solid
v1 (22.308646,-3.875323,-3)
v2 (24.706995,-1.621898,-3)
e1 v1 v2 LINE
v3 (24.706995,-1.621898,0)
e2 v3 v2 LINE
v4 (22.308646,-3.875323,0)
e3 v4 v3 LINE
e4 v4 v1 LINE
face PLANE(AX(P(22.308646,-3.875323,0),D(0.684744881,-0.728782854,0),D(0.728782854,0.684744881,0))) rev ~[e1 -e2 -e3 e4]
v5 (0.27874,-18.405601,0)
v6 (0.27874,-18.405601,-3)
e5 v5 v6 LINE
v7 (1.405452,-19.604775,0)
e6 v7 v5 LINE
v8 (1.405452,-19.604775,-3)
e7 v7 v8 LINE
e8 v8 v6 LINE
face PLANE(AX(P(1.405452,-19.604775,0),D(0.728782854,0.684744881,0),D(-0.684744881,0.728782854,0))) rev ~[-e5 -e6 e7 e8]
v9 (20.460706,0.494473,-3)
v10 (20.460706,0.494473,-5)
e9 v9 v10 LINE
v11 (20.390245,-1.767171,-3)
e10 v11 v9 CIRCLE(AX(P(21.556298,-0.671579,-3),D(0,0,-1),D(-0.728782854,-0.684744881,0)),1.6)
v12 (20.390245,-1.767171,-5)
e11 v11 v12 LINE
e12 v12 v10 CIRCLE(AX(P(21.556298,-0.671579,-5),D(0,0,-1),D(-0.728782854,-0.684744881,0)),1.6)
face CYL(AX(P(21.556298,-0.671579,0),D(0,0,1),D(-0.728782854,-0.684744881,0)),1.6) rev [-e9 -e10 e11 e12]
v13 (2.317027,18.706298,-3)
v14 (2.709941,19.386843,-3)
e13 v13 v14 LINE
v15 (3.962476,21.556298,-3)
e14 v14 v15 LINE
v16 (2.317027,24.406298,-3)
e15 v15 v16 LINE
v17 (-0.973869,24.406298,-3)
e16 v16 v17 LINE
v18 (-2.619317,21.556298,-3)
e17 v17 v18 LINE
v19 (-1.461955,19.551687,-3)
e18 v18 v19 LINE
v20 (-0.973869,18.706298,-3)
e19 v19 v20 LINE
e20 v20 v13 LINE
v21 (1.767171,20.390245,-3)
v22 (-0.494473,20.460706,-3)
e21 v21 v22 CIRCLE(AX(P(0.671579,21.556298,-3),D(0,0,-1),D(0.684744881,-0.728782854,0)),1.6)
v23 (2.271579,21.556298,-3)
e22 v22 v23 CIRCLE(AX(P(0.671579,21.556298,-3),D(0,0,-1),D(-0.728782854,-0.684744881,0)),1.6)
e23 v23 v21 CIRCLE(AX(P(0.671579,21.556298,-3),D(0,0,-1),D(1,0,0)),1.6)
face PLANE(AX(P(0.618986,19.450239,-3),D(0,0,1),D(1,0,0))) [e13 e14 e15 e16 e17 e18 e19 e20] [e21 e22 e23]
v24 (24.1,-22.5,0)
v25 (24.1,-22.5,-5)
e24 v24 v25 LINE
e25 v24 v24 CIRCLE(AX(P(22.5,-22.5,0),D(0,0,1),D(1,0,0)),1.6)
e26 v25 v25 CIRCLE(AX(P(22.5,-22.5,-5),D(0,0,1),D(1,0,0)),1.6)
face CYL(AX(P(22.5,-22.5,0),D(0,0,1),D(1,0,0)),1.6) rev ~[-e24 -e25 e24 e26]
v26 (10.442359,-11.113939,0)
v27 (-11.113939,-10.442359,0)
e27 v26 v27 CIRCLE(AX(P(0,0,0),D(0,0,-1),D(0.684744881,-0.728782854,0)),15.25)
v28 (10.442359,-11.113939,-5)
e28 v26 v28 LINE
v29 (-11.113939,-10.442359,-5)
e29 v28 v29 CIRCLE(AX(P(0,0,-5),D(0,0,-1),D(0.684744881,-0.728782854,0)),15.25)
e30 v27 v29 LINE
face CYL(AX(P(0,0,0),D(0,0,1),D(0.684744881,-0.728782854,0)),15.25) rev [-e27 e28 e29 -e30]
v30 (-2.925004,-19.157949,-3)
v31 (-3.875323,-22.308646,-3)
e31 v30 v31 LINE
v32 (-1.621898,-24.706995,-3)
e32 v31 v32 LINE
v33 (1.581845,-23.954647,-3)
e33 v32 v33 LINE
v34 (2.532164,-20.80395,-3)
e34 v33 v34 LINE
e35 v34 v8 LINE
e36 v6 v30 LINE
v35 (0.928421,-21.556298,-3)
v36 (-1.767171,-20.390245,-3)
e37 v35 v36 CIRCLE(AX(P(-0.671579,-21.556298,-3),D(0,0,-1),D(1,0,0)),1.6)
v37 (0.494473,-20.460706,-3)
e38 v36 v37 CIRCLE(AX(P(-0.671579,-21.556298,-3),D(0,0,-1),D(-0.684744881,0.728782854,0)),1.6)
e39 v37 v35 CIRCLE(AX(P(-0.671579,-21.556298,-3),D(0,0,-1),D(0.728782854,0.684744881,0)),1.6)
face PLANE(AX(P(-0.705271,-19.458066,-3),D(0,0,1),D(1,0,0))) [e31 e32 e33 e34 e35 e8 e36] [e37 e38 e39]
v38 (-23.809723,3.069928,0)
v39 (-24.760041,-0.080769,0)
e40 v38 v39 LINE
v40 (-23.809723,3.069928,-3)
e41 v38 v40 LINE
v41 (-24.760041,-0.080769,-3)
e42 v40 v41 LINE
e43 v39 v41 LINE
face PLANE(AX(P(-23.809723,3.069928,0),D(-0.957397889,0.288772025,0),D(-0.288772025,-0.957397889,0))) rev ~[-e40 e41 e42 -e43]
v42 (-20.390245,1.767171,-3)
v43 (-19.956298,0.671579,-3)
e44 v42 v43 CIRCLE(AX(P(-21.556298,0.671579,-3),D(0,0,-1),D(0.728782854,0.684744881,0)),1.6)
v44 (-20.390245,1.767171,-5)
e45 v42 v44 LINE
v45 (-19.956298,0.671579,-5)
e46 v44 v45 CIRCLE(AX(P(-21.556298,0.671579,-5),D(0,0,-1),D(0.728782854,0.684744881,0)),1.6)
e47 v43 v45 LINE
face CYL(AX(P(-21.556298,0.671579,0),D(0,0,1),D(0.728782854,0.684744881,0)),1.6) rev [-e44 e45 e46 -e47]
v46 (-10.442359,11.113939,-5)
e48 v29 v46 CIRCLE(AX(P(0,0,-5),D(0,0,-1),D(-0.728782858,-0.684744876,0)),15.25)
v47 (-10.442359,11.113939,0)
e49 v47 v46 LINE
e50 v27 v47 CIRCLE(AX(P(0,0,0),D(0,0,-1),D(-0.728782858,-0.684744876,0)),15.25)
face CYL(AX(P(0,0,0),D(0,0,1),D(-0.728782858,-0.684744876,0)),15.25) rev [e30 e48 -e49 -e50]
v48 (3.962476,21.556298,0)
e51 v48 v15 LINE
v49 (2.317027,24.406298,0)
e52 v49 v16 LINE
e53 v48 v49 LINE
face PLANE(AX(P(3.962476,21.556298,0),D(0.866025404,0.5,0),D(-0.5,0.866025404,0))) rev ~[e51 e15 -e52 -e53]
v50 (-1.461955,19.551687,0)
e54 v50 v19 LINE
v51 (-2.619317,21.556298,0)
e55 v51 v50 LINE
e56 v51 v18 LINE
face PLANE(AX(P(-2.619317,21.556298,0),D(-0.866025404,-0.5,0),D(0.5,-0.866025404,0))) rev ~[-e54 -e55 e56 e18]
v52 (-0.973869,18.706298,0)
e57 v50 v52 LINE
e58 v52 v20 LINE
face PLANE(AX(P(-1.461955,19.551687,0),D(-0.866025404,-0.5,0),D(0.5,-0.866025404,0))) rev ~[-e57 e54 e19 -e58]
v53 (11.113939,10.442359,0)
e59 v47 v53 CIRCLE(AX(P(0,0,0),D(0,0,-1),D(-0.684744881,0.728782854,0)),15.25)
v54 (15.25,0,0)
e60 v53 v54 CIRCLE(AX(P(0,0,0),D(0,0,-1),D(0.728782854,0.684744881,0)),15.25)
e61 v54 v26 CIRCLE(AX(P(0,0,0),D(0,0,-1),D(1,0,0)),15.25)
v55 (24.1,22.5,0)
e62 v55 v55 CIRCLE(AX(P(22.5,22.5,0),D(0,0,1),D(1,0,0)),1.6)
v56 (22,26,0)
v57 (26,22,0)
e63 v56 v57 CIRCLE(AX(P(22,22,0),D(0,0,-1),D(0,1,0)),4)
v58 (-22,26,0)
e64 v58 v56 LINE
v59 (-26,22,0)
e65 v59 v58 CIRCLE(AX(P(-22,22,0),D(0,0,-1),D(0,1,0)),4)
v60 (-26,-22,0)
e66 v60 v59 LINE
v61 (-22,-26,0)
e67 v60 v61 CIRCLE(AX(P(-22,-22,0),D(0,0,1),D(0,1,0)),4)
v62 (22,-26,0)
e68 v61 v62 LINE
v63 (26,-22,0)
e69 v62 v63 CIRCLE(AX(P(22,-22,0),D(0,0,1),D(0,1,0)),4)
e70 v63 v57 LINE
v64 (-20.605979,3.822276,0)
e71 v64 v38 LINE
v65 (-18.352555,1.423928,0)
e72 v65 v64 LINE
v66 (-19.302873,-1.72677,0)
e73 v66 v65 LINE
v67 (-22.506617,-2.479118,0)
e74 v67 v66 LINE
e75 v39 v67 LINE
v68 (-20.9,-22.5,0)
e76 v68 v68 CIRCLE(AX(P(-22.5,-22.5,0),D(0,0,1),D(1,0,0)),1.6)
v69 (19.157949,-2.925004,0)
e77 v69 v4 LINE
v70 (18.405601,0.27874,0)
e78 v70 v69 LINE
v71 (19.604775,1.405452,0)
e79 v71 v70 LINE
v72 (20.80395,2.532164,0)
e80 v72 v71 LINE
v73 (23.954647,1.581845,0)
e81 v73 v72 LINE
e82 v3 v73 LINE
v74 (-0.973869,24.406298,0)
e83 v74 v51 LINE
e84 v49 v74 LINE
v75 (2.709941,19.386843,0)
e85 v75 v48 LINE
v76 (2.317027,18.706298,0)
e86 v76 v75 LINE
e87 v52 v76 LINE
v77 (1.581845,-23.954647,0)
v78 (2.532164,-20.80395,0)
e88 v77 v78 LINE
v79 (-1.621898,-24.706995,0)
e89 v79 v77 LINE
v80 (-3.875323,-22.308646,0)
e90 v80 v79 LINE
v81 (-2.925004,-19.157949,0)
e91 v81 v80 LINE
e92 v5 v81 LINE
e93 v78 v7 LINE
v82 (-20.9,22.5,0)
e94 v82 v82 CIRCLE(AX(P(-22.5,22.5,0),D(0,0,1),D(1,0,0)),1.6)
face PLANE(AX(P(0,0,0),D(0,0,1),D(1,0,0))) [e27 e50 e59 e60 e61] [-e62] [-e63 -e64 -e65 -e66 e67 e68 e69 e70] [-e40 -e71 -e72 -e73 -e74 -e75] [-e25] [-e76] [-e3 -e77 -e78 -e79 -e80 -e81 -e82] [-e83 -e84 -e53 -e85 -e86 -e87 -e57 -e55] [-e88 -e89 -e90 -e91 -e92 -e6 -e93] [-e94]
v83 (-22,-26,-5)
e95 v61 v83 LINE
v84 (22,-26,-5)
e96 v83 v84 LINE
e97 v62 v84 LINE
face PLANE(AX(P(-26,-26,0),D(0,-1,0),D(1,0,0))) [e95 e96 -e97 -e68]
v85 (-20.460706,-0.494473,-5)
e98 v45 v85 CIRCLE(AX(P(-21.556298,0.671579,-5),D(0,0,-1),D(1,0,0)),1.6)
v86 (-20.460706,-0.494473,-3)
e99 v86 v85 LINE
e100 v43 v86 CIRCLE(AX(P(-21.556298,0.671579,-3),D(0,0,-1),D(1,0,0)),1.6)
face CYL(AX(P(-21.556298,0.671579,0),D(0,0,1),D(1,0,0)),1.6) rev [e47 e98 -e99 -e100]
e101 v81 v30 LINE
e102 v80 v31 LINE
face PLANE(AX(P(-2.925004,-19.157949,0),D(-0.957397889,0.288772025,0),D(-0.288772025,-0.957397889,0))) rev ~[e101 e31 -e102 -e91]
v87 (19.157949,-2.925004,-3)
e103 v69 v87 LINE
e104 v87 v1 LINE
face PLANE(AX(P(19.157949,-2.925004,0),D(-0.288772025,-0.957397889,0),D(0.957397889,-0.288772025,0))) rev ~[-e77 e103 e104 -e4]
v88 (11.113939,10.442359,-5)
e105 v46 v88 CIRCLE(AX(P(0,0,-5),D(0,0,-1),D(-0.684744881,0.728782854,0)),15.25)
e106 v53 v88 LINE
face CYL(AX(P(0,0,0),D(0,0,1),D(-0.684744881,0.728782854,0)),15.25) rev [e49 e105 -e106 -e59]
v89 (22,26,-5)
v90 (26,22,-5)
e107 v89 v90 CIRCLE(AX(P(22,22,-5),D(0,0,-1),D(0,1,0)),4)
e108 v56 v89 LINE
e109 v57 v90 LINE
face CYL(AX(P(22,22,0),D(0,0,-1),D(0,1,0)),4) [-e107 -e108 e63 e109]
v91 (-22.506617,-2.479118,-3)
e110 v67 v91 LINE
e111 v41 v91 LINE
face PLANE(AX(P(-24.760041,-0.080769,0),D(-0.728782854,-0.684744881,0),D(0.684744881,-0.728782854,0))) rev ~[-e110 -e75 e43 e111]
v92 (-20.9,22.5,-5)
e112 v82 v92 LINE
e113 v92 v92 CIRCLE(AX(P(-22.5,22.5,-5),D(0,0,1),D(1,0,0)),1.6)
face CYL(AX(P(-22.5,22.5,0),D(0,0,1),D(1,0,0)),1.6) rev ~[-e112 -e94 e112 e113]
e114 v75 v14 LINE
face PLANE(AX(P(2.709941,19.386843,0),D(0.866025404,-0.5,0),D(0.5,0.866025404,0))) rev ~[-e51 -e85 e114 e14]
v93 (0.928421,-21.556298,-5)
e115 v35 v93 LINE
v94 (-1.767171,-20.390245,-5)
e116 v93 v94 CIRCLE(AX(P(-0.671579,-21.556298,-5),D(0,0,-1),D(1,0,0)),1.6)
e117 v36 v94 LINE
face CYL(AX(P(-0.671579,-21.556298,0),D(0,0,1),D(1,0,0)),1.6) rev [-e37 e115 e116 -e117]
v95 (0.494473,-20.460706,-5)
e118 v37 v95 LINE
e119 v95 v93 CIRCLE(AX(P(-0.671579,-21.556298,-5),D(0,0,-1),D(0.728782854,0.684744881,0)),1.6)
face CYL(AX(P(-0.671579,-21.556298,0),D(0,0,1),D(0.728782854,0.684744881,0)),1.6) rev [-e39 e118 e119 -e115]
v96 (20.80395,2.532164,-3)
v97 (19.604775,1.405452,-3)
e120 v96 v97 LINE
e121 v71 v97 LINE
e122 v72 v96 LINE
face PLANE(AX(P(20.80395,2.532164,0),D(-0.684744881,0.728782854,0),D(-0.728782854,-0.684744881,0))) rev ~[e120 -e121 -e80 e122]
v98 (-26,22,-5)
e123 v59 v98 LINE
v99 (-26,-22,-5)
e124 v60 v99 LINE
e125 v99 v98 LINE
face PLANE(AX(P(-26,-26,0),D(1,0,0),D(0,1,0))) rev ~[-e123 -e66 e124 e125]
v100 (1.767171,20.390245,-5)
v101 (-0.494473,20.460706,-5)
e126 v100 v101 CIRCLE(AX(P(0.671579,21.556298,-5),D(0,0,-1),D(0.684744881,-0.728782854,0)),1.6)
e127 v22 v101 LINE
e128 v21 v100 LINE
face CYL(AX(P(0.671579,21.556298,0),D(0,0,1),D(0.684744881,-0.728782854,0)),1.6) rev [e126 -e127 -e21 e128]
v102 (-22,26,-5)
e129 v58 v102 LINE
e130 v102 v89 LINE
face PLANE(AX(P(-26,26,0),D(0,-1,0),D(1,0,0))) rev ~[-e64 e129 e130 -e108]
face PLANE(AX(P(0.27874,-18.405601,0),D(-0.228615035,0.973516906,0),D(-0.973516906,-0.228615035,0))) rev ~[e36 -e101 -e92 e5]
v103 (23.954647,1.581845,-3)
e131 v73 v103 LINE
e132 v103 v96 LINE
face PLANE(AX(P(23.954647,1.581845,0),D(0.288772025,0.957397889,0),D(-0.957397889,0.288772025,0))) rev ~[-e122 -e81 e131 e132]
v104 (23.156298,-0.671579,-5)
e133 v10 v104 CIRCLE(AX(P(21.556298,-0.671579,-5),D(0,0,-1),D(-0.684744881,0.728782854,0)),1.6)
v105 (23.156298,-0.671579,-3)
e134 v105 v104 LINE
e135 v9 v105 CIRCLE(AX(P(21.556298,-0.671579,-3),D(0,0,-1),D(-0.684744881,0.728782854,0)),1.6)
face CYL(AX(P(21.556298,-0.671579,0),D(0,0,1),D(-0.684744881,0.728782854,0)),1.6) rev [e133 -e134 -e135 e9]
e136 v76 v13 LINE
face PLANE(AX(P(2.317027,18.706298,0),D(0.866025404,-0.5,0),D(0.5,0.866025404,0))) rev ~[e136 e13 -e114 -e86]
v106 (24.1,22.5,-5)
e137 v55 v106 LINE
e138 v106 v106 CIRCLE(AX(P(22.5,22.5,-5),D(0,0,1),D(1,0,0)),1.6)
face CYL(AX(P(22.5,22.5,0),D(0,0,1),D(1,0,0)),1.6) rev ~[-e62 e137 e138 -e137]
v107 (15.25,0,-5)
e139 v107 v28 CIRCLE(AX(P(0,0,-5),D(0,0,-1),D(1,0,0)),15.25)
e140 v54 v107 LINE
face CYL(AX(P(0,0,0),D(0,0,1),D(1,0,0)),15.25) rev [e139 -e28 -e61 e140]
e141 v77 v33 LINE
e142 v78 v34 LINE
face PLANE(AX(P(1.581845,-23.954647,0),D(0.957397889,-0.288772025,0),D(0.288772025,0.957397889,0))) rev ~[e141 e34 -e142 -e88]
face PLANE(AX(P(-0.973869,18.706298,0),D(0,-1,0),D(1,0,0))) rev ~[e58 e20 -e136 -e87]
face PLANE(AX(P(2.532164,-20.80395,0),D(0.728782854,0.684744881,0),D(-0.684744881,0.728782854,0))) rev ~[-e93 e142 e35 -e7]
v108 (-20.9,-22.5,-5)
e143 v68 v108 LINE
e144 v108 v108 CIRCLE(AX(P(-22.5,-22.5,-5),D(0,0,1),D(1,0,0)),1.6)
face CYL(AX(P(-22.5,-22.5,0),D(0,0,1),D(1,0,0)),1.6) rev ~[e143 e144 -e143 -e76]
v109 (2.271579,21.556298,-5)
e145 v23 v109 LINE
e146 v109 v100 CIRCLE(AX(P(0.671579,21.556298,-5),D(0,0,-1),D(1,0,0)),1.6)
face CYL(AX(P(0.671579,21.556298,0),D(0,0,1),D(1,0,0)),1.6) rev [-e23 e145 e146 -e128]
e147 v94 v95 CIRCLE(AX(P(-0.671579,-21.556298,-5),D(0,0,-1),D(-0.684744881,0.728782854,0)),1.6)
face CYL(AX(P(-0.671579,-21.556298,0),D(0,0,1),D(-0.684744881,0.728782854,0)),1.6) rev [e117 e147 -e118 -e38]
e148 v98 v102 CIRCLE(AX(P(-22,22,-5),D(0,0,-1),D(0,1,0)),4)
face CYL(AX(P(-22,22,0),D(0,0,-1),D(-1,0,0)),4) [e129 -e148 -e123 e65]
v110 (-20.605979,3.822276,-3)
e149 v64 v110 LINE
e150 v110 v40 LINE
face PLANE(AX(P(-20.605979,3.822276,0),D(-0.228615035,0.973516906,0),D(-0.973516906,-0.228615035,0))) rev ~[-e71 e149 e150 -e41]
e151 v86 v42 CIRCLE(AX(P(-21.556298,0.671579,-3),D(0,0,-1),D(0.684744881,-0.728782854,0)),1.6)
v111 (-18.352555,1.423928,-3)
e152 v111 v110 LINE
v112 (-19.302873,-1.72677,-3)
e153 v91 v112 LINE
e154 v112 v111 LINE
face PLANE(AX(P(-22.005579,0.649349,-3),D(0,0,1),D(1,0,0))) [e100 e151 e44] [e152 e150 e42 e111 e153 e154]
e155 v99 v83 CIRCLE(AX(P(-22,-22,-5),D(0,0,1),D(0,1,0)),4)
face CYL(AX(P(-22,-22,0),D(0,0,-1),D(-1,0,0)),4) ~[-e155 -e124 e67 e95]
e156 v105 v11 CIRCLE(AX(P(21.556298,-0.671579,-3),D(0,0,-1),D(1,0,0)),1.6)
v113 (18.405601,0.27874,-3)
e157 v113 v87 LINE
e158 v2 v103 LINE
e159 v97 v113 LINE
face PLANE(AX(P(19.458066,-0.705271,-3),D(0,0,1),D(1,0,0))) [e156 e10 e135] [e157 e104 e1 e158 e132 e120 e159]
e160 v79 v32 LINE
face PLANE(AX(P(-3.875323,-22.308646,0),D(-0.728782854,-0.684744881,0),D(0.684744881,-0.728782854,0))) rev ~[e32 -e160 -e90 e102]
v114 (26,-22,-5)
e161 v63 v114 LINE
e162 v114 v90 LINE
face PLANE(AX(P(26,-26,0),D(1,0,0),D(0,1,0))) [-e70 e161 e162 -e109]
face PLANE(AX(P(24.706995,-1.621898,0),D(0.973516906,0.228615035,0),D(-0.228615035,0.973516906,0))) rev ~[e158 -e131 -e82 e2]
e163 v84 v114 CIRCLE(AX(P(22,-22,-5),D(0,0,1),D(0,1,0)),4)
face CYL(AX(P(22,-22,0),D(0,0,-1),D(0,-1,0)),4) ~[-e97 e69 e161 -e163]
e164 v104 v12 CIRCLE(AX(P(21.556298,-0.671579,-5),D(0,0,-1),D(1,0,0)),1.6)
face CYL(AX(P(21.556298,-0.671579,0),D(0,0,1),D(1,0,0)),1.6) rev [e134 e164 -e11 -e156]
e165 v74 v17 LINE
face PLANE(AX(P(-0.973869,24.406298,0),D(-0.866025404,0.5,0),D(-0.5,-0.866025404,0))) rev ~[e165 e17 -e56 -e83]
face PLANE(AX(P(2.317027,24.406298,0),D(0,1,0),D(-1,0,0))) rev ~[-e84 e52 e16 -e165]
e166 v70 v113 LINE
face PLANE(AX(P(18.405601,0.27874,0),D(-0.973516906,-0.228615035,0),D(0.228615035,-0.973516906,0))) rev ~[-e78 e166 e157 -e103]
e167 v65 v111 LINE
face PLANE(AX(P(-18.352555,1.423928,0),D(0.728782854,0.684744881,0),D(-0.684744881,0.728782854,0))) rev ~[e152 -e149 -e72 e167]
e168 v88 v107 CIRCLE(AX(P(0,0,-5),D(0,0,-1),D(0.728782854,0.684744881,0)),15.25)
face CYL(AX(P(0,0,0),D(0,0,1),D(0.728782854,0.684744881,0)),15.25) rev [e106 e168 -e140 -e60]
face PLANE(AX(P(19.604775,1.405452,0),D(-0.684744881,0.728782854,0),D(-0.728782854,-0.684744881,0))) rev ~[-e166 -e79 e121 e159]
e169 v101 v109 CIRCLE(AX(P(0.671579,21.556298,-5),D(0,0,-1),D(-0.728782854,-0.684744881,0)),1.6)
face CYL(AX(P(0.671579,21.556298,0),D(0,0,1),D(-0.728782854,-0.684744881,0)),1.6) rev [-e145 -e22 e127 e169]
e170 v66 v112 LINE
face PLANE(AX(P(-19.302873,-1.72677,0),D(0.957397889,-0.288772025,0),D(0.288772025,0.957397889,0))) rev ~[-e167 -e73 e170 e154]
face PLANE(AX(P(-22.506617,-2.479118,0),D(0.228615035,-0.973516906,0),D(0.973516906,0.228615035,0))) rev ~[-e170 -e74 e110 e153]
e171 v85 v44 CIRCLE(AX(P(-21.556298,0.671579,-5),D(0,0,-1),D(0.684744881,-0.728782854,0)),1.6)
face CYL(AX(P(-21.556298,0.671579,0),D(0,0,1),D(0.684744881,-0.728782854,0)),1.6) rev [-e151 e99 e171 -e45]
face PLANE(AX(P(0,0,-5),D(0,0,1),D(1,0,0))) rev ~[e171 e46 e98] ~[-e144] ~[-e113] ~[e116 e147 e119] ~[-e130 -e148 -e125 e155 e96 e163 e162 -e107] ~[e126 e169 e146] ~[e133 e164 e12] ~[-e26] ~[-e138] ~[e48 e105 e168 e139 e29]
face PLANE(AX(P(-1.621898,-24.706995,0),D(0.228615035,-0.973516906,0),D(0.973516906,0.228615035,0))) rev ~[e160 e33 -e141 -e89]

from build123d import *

# Parameters (mm, degrees)
F0_W     = 52
F0_H     = 52
F0_R     = 1.6
F1_DEPTH = 5
F2_DEPTH = 3
F3_R     = 4


# Not quite as in the source:
# - a feature names something its author has since deleted; it is built from what else it names


with BuildPart() as f1:
    # F0 (on Top) → F1 (new body)
    with BuildSketch(Plane.XY):
        Rectangle(F0_W, F0_H)
        with Locations((-22.5, -22.5)):
            Circle(F0_R, mode=Mode.SUBTRACT)
        Polygon((2.709940502, 19.3868434803), (11.1139385238, 10.4423594312), (19.6047750449, 1.4054520414), (20.8039495292, 2.5321643188), (23.9546469235, 1.5818454623), (24.7069953493, -1.6218979491), (22.3086463807, -3.875322504), (19.1579489863, -2.9250036475), (10.4423594312, -11.1139385238), (1.4054520414, -19.6047750449), (2.5321643188, -20.8039495292), (1.5818454623, -23.9546469235), (-1.6218979491, -24.7069953493), (-3.875322504, -22.3086463807), (-2.9250036475, -19.1579489863), (-11.1139385858, -10.4423593652), (-19.3028734, -1.726769876), (-22.5066168114, -2.4791183018), (-24.7600413664, -0.0807693332), (-23.8097225099, 3.0699280612), (-20.6059790985, 3.822276487), (-19.479266821, 2.6231020027), (-10.4423594312, 11.1139385238), (-1.4619546156, 19.5516867371), (-2.6193174418, 21.5562979549), (-0.9738691746, 24.4062979549), (2.3170273598, 24.4062979549), (3.962475627, 21.5562979549), align=None, mode=Mode.SUBTRACT)
        with Locations((22.5, -22.5)):
            Circle(F0_R, mode=Mode.SUBTRACT)
        with Locations((-22.5, 22.5)):
            Circle(F0_R, mode=Mode.SUBTRACT)
        with Locations((22.5, 22.5)):
            Circle(F0_R, mode=Mode.SUBTRACT)
        with BuildLine():
            ThreePointArc((-10.4423594312, 11.1139385238), (0.4748781305, 15.2426044612), (11.1139385238, 10.4423594312))
            Line((11.1139385238, 10.4423594312), (2.709940502, 19.3868434803))
            Line((2.709940502, 19.3868434803), (2.3170273598, 18.7062979549))
            Line((2.3170273598, 18.7062979549), (-0.9738691746, 18.7062979549))
            Line((-0.9738691746, 18.7062979549), (-1.4619546156, 19.5516867371))
            Line((-1.4619546156, 19.5516867371), (-10.4423594312, 11.1139385238))
        make_face()
        with BuildLine():
            ThreePointArc((11.1139385238, 10.4423594312), (14.1783296352, 5.6158230702), (15.25, 0))
            ThreePointArc((15.25, 0), (13.9965796058, -6.054606456), (10.4423594312, -11.1139385238))
            Line((10.4423594312, -11.1139385238), (19.1579489863, -2.9250036475))
            Line((19.1579489863, -2.9250036475), (18.4056005606, 0.2787397639))
            Line((18.4056005606, 0.2787397639), (19.6047750449, 1.4054520414))
            Line((19.6047750449, 1.4054520414), (11.1139385238, 10.4423594312))
        make_face()
        with BuildLine():
            Line((1.4054520414, -19.6047750449), (10.4423594312, -11.1139385238))
            ThreePointArc((10.4423594312, -11.1139385238), (-0.4748781757, -15.2426044598), (-11.1139385858, -10.4423593652))
            Line((-11.1139385858, -10.4423593652), (-2.9250036475, -19.1579489863))
            Line((-2.9250036475, -19.1579489863), (0.2787397639, -18.4056005606))
            Line((0.2787397639, -18.4056005606), (1.4054520414, -19.6047750449))
        make_face()
        with BuildLine():
            ThreePointArc((-11.1139385858, -10.4423593652), (-15.2426044598, 0.4748781757), (-10.4423594312, 11.1139385238))
            Line((-10.4423594312, 11.1139385238), (-19.479266821, 2.6231020027))
            Line((-19.479266821, 2.6231020027), (-18.3525545435, 1.4239275184))
            Line((-18.3525545435, 1.4239275184), (-19.3028734, -1.726769876))
            Line((-19.3028734, -1.726769876), (-11.1139385858, -10.4423593652))
        make_face()
        with BuildLine():
            Line((-18.3525545435, 1.4239275184), (-19.479266821, 2.6231020027))
            Line((-19.479266821, 2.6231020027), (-20.3902453885, 1.7671709018))
            ThreePointArc((-20.3902453885, 1.7671709018), (-20.0687355014, 1.2607802016), (-19.9562979549, 0.6715790926))
            ThreePointArc((-19.9562979549, 0.6715790926), (-20.087804357, 0.0363416939), (-20.4607061458, -0.4944734738))
            Line((-20.4607061458, -0.4944734738), (-19.3028734, -1.726769876))
            Line((-19.3028734, -1.726769876), (-18.3525545435, 1.4239275184))
        make_face()
        with BuildLine():
            Line((-20.3902453885, 1.7671709018), (-19.479266821, 2.6231020027))
            Line((-19.479266821, 2.6231020027), (-20.6059790985, 3.822276487))
            Line((-20.6059790985, 3.822276487), (-23.8097225099, 3.0699280612))
            Line((-23.8097225099, 3.0699280612), (-24.7600413664, -0.0807693332))
            Line((-24.7600413664, -0.0807693332), (-22.5066168114, -2.4791183018))
            Line((-22.5066168114, -2.4791183018), (-19.3028734, -1.726769876))
            Line((-19.3028734, -1.726769876), (-20.4607061458, -0.4944734738))
            ThreePointArc((-20.4607061458, -0.4944734738), (-23.1555220296, 0.7214023719), (-20.3902453885, 1.7671709018))
        make_face()
        with BuildLine():
            Line((1.7671709018, 20.3902453885), (2.709940502, 19.3868434803))
            Line((2.709940502, 19.3868434803), (3.962475627, 21.5562979549))
            Line((3.962475627, 21.5562979549), (2.3170273598, 24.4062979549))
            Line((2.3170273598, 24.4062979549), (-0.9738691746, 24.4062979549))
            Line((-0.9738691746, 24.4062979549), (-2.6193174418, 21.5562979549))
            Line((-2.6193174418, 21.5562979549), (-1.4619546156, 19.5516867371))
            Line((-1.4619546156, 19.5516867371), (-0.4944734738, 20.4607061458))
            ThreePointArc((-0.4944734738, 20.4607061458), (0.0823779836, 23.0438604085), (2.2715790926, 21.5562979549))
            ThreePointArc((2.2715790926, 21.5562979549), (2.1400726906, 20.9210605563), (1.7671709018, 20.3902453885))
        make_face()
        with BuildLine():
            Line((2.3170273598, 18.7062979549), (2.709940502, 19.3868434803))
            Line((2.709940502, 19.3868434803), (1.7671709018, 20.3902453885))
            ThreePointArc((1.7671709018, 20.3902453885), (0.6217558133, 19.9570738803), (-0.4944734738, 20.4607061458))
            Line((-0.4944734738, 20.4607061458), (-1.4619546156, 19.5516867371))
            Line((-1.4619546156, 19.5516867371), (-0.9738691746, 18.7062979549))
            Line((-0.9738691746, 18.7062979549), (2.3170273598, 18.7062979549))
        make_face()
        with BuildLine():
            Line((20.4607061458, 0.4944734738), (19.6047750449, 1.4054520414))
            Line((19.6047750449, 1.4054520414), (18.4056005606, 0.2787397639))
            Line((18.4056005606, 0.2787397639), (19.1579489863, -2.9250036475))
            Line((19.1579489863, -2.9250036475), (20.3902453885, -1.7671709018))
            ThreePointArc((20.3902453885, -1.7671709018), (19.9570738803, -0.6217558133), (20.4607061458, 0.4944734738))
        make_face()
        with BuildLine():
            Line((20.8039495292, 2.5321643188), (19.6047750449, 1.4054520414))
            Line((19.6047750449, 1.4054520414), (20.4607061458, 0.4944734738))
            ThreePointArc((20.4607061458, 0.4944734738), (22.1915353536, 0.7969145054), (23.1562979549, -0.6715790926))
            ThreePointArc((23.1562979549, -0.6715790926), (22.145499064, -2.1591415461), (20.3902453885, -1.7671709018))
            Line((20.3902453885, -1.7671709018), (19.1579489863, -2.9250036475))
            Line((19.1579489863, -2.9250036475), (22.3086463807, -3.875322504))
            Line((22.3086463807, -3.875322504), (24.7069953493, -1.6218979491))
            Line((24.7069953493, -1.6218979491), (23.9546469235, 1.5818454623))
            Line((23.9546469235, 1.5818454623), (20.8039495292, 2.5321643188))
        make_face()
        with BuildLine():
            Line((2.5321643188, -20.8039495292), (1.4054520414, -19.6047750449))
            Line((1.4054520414, -19.6047750449), (0.4944734738, -20.4607061458))
            ThreePointArc((0.4944734738, -20.4607061458), (0.8159833609, -20.9670968459), (0.9284209074, -21.5562979549))
            ThreePointArc((0.9284209074, -21.5562979549), (-1.3068164913, -23.0247915529), (-1.7671709018, -20.3902453885))
            Line((-1.7671709018, -20.3902453885), (-2.9250036475, -19.1579489863))
            Line((-2.9250036475, -19.1579489863), (-3.875322504, -22.3086463807))
            Line((-3.875322504, -22.3086463807), (-1.6218979491, -24.7069953493))
            Line((-1.6218979491, -24.7069953493), (1.5818454623, -23.9546469235))
            Line((1.5818454623, -23.9546469235), (2.5321643188, -20.8039495292))
        make_face()
        with BuildLine():
            Line((0.4944734738, -20.4607061458), (1.4054520414, -19.6047750449))
            Line((1.4054520414, -19.6047750449), (0.2787397639, -18.4056005606))
            Line((0.2787397639, -18.4056005606), (-2.9250036475, -19.1579489863))
            Line((-2.9250036475, -19.1579489863), (-1.7671709018, -20.3902453885))
            ThreePointArc((-1.7671709018, -20.3902453885), (-0.6217558133, -19.9570738803), (0.4944734738, -20.4607061458))
        make_face()
    extrude(amount=-F1_DEPTH)

    # F0 (on Top) → F2 (cut)
    with BuildSketch(Plane.XY):
        with BuildLine():
            Line((-20.3902453885, 1.7671709018), (-19.479266821, 2.6231020027))
            Line((-19.479266821, 2.6231020027), (-20.6059790985, 3.822276487))
            Line((-20.6059790985, 3.822276487), (-23.8097225099, 3.0699280612))
            Line((-23.8097225099, 3.0699280612), (-24.7600413664, -0.0807693332))
            Line((-24.7600413664, -0.0807693332), (-22.5066168114, -2.4791183018))
            Line((-22.5066168114, -2.4791183018), (-19.3028734, -1.726769876))
            Line((-19.3028734, -1.726769876), (-20.4607061458, -0.4944734738))
            ThreePointArc((-20.4607061458, -0.4944734738), (-23.1555220296, 0.7214023719), (-20.3902453885, 1.7671709018))
        make_face()
        with BuildLine():
            Line((-18.3525545435, 1.4239275184), (-19.479266821, 2.6231020027))
            Line((-19.479266821, 2.6231020027), (-20.3902453885, 1.7671709018))
            ThreePointArc((-20.3902453885, 1.7671709018), (-20.0687355014, 1.2607802016), (-19.9562979549, 0.6715790926))
            ThreePointArc((-19.9562979549, 0.6715790926), (-20.087804357, 0.0363416939), (-20.4607061458, -0.4944734738))
            Line((-20.4607061458, -0.4944734738), (-19.3028734, -1.726769876))
            Line((-19.3028734, -1.726769876), (-18.3525545435, 1.4239275184))
        make_face()
        with BuildLine():
            Line((2.3170273598, 18.7062979549), (2.709940502, 19.3868434803))
            Line((2.709940502, 19.3868434803), (1.7671709018, 20.3902453885))
            ThreePointArc((1.7671709018, 20.3902453885), (0.6217558133, 19.9570738803), (-0.4944734738, 20.4607061458))
            Line((-0.4944734738, 20.4607061458), (-1.4619546156, 19.5516867371))
            Line((-1.4619546156, 19.5516867371), (-0.9738691746, 18.7062979549))
            Line((-0.9738691746, 18.7062979549), (2.3170273598, 18.7062979549))
        make_face()
        with BuildLine():
            Line((1.7671709018, 20.3902453885), (2.709940502, 19.3868434803))
            Line((2.709940502, 19.3868434803), (3.962475627, 21.5562979549))
            Line((3.962475627, 21.5562979549), (2.3170273598, 24.4062979549))
            Line((2.3170273598, 24.4062979549), (-0.9738691746, 24.4062979549))
            Line((-0.9738691746, 24.4062979549), (-2.6193174418, 21.5562979549))
            Line((-2.6193174418, 21.5562979549), (-1.4619546156, 19.5516867371))
            Line((-1.4619546156, 19.5516867371), (-0.4944734738, 20.4607061458))
            ThreePointArc((-0.4944734738, 20.4607061458), (0.0823779836, 23.0438604085), (2.2715790926, 21.5562979549))
            ThreePointArc((2.2715790926, 21.5562979549), (2.1400726906, 20.9210605563), (1.7671709018, 20.3902453885))
        make_face()
        with BuildLine():
            Line((20.4607061458, 0.4944734738), (19.6047750449, 1.4054520414))
            Line((19.6047750449, 1.4054520414), (18.4056005606, 0.2787397639))
            Line((18.4056005606, 0.2787397639), (19.1579489863, -2.9250036475))
            Line((19.1579489863, -2.9250036475), (20.3902453885, -1.7671709018))
            ThreePointArc((20.3902453885, -1.7671709018), (19.9570738803, -0.6217558133), (20.4607061458, 0.4944734738))
        make_face()
        with BuildLine():
            Line((20.8039495292, 2.5321643188), (19.6047750449, 1.4054520414))
            Line((19.6047750449, 1.4054520414), (20.4607061458, 0.4944734738))
            ThreePointArc((20.4607061458, 0.4944734738), (22.1915353536, 0.7969145054), (23.1562979549, -0.6715790926))
            ThreePointArc((23.1562979549, -0.6715790926), (22.145499064, -2.1591415461), (20.3902453885, -1.7671709018))
            Line((20.3902453885, -1.7671709018), (19.1579489863, -2.9250036475))
            Line((19.1579489863, -2.9250036475), (22.3086463807, -3.875322504))
            Line((22.3086463807, -3.875322504), (24.7069953493, -1.6218979491))
            Line((24.7069953493, -1.6218979491), (23.9546469235, 1.5818454623))
            Line((23.9546469235, 1.5818454623), (20.8039495292, 2.5321643188))
        make_face()
        with BuildLine():
            Line((0.4944734738, -20.4607061458), (1.4054520414, -19.6047750449))
            Line((1.4054520414, -19.6047750449), (0.2787397639, -18.4056005606))
            Line((0.2787397639, -18.4056005606), (-2.9250036475, -19.1579489863))
            Line((-2.9250036475, -19.1579489863), (-1.7671709018, -20.3902453885))
            ThreePointArc((-1.7671709018, -20.3902453885), (-0.6217558133, -19.9570738803), (0.4944734738, -20.4607061458))
        make_face()
        with BuildLine():
            Line((2.5321643188, -20.8039495292), (1.4054520414, -19.6047750449))
            Line((1.4054520414, -19.6047750449), (0.4944734738, -20.4607061458))
            ThreePointArc((0.4944734738, -20.4607061458), (0.8159833609, -20.9670968459), (0.9284209074, -21.5562979549))
            ThreePointArc((0.9284209074, -21.5562979549), (-1.3068164913, -23.0247915529), (-1.7671709018, -20.3902453885))
            Line((-1.7671709018, -20.3902453885), (-2.9250036475, -19.1579489863))
            Line((-2.9250036475, -19.1579489863), (-3.875322504, -22.3086463807))
            Line((-3.875322504, -22.3086463807), (-1.6218979491, -24.7069953493))
            Line((-1.6218979491, -24.7069953493), (1.5818454623, -23.9546469235))
            Line((1.5818454623, -23.9546469235), (2.5321643188, -20.8039495292))
        make_face()
    extrude(amount=-F2_DEPTH, mode=Mode.SUBTRACT)

    # F3
    f3_edges = [f1.edges().sort_by_distance(p)[0] for p in [
        (-26, -26, -2.5),
        (26, -26, -2.5),
        (-26, 26, -2.5),
        (26, 26, -2.5),
    ]]
    fillet(f3_edges, radius=F3_R)


solid = f1.part
